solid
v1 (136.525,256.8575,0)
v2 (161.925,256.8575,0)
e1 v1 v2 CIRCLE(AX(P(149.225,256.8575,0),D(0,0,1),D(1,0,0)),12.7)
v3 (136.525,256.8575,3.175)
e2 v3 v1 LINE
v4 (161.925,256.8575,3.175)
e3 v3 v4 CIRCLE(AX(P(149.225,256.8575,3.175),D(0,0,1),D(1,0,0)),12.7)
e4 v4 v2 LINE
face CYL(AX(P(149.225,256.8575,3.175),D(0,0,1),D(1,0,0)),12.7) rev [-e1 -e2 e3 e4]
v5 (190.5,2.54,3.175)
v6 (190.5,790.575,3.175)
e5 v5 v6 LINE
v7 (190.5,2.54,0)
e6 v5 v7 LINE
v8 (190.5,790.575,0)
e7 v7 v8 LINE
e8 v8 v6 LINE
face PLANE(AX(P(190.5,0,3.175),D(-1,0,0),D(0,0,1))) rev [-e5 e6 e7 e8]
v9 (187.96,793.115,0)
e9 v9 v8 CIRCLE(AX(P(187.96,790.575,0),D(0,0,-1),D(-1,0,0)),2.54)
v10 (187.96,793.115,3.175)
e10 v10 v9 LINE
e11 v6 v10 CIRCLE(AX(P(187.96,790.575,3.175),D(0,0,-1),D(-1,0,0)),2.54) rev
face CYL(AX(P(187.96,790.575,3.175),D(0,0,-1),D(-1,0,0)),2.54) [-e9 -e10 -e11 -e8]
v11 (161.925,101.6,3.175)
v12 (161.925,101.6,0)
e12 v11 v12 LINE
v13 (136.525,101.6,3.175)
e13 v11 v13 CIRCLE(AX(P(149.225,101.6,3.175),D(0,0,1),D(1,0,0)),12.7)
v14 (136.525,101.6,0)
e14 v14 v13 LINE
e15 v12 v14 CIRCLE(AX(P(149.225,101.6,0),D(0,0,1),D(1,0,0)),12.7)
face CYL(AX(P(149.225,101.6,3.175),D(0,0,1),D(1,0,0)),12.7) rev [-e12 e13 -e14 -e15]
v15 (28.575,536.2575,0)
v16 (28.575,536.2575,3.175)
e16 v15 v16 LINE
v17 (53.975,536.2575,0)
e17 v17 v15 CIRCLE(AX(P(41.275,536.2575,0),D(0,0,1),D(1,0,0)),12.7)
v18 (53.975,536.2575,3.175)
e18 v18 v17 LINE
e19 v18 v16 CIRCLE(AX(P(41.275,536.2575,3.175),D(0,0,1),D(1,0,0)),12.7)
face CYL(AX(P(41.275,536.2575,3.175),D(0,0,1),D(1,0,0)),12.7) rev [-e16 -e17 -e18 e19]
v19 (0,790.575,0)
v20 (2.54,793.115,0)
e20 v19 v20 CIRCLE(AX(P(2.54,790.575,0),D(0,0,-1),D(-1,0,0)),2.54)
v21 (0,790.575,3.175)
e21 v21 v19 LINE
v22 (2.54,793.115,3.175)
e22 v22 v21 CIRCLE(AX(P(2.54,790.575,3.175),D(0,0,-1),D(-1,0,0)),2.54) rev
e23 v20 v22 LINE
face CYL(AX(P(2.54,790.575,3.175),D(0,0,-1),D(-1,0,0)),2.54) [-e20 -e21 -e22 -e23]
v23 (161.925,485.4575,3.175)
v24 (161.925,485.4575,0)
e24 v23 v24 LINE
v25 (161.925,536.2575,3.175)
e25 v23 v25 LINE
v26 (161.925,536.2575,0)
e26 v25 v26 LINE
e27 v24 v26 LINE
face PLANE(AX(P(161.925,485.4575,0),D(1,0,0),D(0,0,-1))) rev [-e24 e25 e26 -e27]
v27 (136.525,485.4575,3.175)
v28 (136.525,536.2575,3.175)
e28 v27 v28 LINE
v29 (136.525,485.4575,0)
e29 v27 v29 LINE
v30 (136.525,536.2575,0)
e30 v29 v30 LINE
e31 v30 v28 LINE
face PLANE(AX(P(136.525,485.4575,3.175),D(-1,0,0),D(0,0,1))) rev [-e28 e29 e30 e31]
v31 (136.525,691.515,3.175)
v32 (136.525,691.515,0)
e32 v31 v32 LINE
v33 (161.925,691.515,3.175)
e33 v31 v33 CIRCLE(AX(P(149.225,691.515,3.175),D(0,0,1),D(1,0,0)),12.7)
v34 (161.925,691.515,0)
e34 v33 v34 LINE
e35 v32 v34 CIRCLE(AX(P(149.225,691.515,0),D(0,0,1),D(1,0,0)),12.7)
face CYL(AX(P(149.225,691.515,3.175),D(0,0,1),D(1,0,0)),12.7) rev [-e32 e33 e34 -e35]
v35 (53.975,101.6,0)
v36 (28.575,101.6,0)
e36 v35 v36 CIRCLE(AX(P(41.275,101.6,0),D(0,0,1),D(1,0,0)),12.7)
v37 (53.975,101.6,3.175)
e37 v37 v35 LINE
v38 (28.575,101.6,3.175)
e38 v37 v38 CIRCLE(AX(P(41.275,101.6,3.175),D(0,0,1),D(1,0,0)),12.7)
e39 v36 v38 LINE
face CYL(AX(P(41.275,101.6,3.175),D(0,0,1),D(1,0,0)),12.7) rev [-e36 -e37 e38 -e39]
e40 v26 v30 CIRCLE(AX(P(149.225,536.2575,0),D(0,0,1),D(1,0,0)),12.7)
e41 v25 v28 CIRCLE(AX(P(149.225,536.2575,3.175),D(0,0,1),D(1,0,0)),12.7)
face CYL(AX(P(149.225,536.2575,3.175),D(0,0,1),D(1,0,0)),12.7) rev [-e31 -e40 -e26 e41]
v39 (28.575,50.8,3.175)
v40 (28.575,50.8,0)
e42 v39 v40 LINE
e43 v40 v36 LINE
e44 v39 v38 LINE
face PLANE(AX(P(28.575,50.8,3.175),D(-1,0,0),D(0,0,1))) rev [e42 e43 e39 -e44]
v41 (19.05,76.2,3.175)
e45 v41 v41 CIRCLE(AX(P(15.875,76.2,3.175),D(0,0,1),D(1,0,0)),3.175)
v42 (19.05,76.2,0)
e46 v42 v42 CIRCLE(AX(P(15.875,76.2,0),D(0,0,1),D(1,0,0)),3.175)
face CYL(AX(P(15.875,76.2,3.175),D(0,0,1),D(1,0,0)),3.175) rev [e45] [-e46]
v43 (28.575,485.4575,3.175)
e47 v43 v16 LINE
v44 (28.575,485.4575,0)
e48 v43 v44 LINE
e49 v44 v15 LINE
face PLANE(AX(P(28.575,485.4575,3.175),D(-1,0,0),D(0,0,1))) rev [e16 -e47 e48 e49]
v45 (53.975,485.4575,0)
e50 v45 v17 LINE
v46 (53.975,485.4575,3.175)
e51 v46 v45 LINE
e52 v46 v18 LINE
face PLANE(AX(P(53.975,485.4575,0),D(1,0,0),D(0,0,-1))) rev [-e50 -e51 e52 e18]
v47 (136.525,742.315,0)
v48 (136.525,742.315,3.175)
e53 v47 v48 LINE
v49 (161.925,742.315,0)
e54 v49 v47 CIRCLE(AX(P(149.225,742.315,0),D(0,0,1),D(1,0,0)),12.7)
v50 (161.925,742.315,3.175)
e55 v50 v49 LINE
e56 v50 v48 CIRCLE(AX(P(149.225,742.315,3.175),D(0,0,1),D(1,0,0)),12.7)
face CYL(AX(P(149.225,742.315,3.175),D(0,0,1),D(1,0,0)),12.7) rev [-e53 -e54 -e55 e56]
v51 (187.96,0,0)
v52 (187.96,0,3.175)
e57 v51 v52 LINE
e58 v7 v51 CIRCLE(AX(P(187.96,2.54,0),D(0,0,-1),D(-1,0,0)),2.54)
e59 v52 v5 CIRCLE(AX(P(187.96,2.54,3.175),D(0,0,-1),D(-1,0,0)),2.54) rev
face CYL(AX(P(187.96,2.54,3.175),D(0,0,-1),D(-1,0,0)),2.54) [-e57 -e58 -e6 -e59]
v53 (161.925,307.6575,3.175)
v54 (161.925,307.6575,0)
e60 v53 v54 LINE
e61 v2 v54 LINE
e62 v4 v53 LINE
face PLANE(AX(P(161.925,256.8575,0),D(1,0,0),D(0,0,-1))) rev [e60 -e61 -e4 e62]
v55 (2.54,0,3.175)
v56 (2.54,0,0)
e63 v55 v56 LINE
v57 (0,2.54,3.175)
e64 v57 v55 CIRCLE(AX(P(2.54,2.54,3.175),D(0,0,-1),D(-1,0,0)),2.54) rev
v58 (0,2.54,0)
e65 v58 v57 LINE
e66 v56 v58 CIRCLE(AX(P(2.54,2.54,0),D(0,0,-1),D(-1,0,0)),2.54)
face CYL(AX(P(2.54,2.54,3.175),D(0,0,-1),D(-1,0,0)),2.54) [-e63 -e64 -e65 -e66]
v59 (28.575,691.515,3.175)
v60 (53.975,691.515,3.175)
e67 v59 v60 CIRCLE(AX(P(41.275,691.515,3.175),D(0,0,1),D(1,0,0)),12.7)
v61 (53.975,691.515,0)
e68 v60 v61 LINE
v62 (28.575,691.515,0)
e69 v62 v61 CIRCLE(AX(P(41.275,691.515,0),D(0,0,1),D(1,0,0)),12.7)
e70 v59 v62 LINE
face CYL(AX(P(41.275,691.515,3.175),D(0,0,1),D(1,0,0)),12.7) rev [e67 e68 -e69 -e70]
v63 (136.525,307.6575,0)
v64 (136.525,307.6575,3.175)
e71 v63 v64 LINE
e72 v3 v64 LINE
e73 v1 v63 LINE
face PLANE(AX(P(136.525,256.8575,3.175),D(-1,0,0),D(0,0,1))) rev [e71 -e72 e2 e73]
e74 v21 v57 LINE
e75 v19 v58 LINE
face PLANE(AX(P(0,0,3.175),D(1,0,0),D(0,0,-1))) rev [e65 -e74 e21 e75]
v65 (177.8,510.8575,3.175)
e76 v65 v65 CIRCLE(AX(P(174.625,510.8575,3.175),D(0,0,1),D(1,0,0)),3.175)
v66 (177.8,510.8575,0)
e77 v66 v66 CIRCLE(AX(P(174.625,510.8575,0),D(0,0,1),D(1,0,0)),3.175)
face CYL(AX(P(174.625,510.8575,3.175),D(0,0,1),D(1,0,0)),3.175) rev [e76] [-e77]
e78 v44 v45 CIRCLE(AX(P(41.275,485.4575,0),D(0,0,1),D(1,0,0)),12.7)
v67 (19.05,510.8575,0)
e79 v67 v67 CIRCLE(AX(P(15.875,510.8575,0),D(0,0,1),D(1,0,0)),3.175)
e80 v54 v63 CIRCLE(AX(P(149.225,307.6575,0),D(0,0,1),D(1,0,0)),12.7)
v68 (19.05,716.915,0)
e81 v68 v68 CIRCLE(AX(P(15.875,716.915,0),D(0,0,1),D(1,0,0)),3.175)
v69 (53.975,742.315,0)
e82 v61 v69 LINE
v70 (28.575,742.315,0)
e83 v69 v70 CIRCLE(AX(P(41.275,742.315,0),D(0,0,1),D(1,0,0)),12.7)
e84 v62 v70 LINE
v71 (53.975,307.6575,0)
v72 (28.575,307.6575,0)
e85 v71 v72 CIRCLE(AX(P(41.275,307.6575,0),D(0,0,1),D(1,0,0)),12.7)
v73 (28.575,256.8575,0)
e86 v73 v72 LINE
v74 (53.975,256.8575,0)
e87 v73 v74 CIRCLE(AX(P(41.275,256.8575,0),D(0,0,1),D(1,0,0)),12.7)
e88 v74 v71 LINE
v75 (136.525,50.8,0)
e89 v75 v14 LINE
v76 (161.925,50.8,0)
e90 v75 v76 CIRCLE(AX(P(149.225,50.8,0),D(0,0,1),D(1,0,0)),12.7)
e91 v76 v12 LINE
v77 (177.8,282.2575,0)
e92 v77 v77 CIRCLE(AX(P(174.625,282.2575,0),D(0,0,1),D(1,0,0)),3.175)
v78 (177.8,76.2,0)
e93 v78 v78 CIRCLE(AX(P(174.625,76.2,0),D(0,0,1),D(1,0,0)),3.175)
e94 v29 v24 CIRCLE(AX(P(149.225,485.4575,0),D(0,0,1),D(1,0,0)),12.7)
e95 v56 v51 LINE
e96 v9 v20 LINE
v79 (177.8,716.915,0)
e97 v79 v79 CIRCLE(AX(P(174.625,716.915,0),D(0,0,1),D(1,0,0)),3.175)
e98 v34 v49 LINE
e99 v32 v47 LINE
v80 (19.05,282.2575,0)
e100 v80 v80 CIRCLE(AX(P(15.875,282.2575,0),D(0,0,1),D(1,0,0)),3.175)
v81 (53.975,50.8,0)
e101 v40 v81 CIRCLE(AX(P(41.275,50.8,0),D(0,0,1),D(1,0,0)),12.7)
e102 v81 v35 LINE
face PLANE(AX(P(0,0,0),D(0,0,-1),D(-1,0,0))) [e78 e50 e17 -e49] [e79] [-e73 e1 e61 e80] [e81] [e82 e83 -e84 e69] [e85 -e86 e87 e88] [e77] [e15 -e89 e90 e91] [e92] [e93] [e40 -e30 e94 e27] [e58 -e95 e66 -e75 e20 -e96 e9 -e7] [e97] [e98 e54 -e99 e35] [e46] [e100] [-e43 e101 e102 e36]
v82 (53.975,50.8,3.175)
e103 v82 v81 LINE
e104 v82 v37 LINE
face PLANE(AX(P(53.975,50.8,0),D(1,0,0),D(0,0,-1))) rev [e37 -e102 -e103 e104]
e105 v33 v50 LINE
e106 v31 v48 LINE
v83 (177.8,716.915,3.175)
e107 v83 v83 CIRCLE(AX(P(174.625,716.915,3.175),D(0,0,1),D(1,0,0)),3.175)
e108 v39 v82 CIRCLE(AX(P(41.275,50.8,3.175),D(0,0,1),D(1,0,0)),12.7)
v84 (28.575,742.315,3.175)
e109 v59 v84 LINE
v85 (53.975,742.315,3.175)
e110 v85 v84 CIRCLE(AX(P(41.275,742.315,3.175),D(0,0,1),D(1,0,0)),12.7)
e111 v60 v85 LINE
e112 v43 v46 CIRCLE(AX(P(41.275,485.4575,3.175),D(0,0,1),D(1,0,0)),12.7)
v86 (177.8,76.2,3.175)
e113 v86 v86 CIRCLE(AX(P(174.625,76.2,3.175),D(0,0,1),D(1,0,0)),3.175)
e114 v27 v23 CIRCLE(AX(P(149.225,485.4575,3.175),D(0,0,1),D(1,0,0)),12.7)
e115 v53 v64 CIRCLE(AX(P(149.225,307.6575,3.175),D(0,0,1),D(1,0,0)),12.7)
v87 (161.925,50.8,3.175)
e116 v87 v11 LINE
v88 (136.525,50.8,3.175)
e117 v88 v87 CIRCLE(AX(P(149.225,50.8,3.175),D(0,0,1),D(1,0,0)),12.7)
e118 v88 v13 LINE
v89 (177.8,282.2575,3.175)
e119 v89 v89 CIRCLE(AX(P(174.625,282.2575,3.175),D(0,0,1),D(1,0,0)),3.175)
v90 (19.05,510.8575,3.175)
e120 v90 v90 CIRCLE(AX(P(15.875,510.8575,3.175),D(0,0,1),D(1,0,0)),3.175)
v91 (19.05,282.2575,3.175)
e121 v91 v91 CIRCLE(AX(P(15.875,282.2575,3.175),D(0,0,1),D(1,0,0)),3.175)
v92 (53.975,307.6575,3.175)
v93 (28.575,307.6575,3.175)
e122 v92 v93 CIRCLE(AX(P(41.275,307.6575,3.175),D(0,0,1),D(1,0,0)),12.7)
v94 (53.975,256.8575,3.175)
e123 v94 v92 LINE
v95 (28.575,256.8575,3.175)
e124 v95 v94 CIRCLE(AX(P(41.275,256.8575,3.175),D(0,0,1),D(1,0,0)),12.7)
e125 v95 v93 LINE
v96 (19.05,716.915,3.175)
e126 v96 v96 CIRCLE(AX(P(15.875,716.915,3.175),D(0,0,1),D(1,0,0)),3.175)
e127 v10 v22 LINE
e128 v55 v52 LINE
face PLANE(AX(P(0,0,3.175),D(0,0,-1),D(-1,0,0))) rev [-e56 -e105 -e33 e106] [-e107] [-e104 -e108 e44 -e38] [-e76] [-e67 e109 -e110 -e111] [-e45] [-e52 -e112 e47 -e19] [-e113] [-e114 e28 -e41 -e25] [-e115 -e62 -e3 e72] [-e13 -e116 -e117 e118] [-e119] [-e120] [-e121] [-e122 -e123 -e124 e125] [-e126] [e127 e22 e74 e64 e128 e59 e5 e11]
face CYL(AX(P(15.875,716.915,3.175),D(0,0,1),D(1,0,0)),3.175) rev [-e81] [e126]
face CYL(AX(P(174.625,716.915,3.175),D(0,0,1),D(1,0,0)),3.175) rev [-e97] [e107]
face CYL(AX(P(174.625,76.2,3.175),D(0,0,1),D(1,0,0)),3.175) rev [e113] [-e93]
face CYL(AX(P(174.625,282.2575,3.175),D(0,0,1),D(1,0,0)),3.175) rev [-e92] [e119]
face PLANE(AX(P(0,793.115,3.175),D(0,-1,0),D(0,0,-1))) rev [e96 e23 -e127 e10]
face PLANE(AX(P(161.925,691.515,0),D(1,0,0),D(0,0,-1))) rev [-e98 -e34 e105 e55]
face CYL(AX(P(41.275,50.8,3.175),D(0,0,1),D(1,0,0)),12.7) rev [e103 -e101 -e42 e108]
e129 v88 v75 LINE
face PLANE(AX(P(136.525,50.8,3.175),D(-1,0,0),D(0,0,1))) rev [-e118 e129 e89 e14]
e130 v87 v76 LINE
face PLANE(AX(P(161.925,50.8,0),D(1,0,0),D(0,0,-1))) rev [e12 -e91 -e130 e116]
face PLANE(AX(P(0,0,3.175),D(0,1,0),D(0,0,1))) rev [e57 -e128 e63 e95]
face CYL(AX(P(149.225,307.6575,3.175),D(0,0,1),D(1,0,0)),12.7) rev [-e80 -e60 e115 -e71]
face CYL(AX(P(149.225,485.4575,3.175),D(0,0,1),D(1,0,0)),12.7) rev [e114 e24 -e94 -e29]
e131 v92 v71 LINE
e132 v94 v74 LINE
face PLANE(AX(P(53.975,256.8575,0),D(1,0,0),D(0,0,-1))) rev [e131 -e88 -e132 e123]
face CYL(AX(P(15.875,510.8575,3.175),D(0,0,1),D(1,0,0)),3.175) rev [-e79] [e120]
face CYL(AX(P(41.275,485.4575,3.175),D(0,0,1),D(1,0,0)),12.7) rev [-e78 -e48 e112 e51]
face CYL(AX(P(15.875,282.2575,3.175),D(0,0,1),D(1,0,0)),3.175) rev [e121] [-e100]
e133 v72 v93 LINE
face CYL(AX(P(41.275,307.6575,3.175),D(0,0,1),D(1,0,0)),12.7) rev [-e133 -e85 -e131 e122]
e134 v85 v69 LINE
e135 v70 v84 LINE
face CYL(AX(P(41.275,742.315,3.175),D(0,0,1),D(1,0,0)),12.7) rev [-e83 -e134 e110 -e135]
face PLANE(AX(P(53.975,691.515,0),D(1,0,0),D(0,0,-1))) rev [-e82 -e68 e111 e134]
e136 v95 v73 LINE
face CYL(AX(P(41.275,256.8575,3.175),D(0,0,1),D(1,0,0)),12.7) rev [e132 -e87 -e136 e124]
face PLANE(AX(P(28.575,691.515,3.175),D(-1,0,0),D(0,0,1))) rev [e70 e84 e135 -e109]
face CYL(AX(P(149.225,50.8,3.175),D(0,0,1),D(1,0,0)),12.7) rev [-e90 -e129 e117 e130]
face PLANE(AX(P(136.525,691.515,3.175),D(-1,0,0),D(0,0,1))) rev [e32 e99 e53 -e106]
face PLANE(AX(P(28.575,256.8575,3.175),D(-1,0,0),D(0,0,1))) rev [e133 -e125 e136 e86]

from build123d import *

# Parameters (mm, degrees)
SKETCH1_W                   = 190.5
SKETCH1_H                   = 793.115
BOSS_EXTRUDE1_DEPTH         = 3.175
F_1_4_0_25_DIAMETER_HOLE1_D = 6.35
F_1_1_DIAMETER_SLOT1_DEPTH  = 3.175
FILLET1_R                   = 2.54


# Read off the part's stored shape, not the designer's step: 1 (1) Diameter Slot1
with BuildPart() as part:
    # Sketch1 → Boss-Extrude1 (new body)
    with BuildSketch(Plane.XY):
        with Locations((95.25, 396.5575)):
            Rectangle(SKETCH1_W, SKETCH1_H)
    extrude(amount=BOSS_EXTRUDE1_DEPTH)

    # 1/4 (0.25) Diameter Hole1 (through all)
    with Locations(Plane.XY.offset(3.175)):
        with Locations((15.875, 716.915), (15.875, 510.8575), (15.875, 282.2575), (15.875, 76.2), (174.625, 76.2), (174.625, 282.2575), (174.625, 510.8575), (174.625, 716.915)):
            Hole(F_1_4_0_25_DIAMETER_HOLE1_D / 2)

    # 1 (1) Diameter Slot1 outline → 1 (1) Diameter Slot1 (cut)
    with BuildSketch(Plane.XY):
        with BuildLine():
            Line((161.925, 691.515), (161.925, 742.315))
            ThreePointArc((161.925, 742.315), (149.225, 755.015), (136.525, 742.315))
            Line((136.525, 742.315), (136.525, 691.515))
            ThreePointArc((136.525, 691.515), (149.225, 678.815), (161.925, 691.515))
        make_face()
        with BuildLine():
            ThreePointArc((161.925, 536.2575), (149.225, 548.9575), (136.525, 536.2575))
            Line((136.525, 536.2575), (136.525, 485.4575))
            ThreePointArc((136.525, 485.4575), (149.225, 472.7575), (161.925, 485.4575))
            Line((161.925, 485.4575), (161.925, 536.2575))
        make_face()
        with BuildLine():
            ThreePointArc((161.925, 307.6575), (149.225, 320.3575), (136.525, 307.6575))
            Line((136.525, 307.6575), (136.525, 256.8575))
            ThreePointArc((136.525, 256.8575), (149.225, 244.1575), (161.925, 256.8575))
            Line((161.925, 256.8575), (161.925, 307.6575))
        make_face()
        with BuildLine():
            ThreePointArc((161.925, 101.6), (149.225, 114.3), (136.525, 101.6))
            Line((136.525, 101.6), (136.525, 50.8))
            ThreePointArc((136.525, 50.8), (149.225, 38.1), (161.925, 50.8))
            Line((161.925, 50.8), (161.925, 101.6))
        make_face()
        with BuildLine():
            Line((53.975, 50.8), (53.975, 101.6))
            ThreePointArc((53.975, 101.6), (41.275, 114.3), (28.575, 101.6))
            Line((28.575, 101.6), (28.575, 50.8))
            ThreePointArc((28.575, 50.8), (41.275, 38.1), (53.975, 50.8))
        make_face()
        with BuildLine():
            ThreePointArc((53.975, 307.6575), (41.275, 320.3575), (28.575, 307.6575))
            Line((28.575, 307.6575), (28.575, 256.8575))
            ThreePointArc((28.575, 256.8575), (41.275, 244.1575), (53.975, 256.8575))
            Line((53.975, 256.8575), (53.975, 307.6575))
        make_face()
        with BuildLine():
            ThreePointArc((53.975, 536.2575), (41.275, 548.9575), (28.575, 536.2575))
            Line((28.575, 536.2575), (28.575, 485.4575))
            ThreePointArc((28.575, 485.4575), (41.275, 472.7575), (53.975, 485.4575))
            Line((53.975, 485.4575), (53.975, 536.2575))
        make_face()
        with BuildLine():
            ThreePointArc((53.975, 742.315), (41.275, 755.015), (28.575, 742.315))
            Line((28.575, 742.315), (28.575, 691.515))
            ThreePointArc((28.575, 691.515), (41.275, 678.815), (53.975, 691.515))
            Line((53.975, 691.515), (53.975, 742.315))
        make_face()
    extrude(amount=F_1_1_DIAMETER_SLOT1_DEPTH, mode=Mode.SUBTRACT)

    # Fillet1
    fillet1_edges = [part.edges().sort_by_distance(p)[0] for p in [
        (0, 793.115, 1.5875),
        (190.5, 793.115, 1.5875),
        (190.5, 0, 1.5875),
        (0, 0, 1.5875),
    ]]
    fillet(fillet1_edges, radius=FILLET1_R)


solid = part.part
